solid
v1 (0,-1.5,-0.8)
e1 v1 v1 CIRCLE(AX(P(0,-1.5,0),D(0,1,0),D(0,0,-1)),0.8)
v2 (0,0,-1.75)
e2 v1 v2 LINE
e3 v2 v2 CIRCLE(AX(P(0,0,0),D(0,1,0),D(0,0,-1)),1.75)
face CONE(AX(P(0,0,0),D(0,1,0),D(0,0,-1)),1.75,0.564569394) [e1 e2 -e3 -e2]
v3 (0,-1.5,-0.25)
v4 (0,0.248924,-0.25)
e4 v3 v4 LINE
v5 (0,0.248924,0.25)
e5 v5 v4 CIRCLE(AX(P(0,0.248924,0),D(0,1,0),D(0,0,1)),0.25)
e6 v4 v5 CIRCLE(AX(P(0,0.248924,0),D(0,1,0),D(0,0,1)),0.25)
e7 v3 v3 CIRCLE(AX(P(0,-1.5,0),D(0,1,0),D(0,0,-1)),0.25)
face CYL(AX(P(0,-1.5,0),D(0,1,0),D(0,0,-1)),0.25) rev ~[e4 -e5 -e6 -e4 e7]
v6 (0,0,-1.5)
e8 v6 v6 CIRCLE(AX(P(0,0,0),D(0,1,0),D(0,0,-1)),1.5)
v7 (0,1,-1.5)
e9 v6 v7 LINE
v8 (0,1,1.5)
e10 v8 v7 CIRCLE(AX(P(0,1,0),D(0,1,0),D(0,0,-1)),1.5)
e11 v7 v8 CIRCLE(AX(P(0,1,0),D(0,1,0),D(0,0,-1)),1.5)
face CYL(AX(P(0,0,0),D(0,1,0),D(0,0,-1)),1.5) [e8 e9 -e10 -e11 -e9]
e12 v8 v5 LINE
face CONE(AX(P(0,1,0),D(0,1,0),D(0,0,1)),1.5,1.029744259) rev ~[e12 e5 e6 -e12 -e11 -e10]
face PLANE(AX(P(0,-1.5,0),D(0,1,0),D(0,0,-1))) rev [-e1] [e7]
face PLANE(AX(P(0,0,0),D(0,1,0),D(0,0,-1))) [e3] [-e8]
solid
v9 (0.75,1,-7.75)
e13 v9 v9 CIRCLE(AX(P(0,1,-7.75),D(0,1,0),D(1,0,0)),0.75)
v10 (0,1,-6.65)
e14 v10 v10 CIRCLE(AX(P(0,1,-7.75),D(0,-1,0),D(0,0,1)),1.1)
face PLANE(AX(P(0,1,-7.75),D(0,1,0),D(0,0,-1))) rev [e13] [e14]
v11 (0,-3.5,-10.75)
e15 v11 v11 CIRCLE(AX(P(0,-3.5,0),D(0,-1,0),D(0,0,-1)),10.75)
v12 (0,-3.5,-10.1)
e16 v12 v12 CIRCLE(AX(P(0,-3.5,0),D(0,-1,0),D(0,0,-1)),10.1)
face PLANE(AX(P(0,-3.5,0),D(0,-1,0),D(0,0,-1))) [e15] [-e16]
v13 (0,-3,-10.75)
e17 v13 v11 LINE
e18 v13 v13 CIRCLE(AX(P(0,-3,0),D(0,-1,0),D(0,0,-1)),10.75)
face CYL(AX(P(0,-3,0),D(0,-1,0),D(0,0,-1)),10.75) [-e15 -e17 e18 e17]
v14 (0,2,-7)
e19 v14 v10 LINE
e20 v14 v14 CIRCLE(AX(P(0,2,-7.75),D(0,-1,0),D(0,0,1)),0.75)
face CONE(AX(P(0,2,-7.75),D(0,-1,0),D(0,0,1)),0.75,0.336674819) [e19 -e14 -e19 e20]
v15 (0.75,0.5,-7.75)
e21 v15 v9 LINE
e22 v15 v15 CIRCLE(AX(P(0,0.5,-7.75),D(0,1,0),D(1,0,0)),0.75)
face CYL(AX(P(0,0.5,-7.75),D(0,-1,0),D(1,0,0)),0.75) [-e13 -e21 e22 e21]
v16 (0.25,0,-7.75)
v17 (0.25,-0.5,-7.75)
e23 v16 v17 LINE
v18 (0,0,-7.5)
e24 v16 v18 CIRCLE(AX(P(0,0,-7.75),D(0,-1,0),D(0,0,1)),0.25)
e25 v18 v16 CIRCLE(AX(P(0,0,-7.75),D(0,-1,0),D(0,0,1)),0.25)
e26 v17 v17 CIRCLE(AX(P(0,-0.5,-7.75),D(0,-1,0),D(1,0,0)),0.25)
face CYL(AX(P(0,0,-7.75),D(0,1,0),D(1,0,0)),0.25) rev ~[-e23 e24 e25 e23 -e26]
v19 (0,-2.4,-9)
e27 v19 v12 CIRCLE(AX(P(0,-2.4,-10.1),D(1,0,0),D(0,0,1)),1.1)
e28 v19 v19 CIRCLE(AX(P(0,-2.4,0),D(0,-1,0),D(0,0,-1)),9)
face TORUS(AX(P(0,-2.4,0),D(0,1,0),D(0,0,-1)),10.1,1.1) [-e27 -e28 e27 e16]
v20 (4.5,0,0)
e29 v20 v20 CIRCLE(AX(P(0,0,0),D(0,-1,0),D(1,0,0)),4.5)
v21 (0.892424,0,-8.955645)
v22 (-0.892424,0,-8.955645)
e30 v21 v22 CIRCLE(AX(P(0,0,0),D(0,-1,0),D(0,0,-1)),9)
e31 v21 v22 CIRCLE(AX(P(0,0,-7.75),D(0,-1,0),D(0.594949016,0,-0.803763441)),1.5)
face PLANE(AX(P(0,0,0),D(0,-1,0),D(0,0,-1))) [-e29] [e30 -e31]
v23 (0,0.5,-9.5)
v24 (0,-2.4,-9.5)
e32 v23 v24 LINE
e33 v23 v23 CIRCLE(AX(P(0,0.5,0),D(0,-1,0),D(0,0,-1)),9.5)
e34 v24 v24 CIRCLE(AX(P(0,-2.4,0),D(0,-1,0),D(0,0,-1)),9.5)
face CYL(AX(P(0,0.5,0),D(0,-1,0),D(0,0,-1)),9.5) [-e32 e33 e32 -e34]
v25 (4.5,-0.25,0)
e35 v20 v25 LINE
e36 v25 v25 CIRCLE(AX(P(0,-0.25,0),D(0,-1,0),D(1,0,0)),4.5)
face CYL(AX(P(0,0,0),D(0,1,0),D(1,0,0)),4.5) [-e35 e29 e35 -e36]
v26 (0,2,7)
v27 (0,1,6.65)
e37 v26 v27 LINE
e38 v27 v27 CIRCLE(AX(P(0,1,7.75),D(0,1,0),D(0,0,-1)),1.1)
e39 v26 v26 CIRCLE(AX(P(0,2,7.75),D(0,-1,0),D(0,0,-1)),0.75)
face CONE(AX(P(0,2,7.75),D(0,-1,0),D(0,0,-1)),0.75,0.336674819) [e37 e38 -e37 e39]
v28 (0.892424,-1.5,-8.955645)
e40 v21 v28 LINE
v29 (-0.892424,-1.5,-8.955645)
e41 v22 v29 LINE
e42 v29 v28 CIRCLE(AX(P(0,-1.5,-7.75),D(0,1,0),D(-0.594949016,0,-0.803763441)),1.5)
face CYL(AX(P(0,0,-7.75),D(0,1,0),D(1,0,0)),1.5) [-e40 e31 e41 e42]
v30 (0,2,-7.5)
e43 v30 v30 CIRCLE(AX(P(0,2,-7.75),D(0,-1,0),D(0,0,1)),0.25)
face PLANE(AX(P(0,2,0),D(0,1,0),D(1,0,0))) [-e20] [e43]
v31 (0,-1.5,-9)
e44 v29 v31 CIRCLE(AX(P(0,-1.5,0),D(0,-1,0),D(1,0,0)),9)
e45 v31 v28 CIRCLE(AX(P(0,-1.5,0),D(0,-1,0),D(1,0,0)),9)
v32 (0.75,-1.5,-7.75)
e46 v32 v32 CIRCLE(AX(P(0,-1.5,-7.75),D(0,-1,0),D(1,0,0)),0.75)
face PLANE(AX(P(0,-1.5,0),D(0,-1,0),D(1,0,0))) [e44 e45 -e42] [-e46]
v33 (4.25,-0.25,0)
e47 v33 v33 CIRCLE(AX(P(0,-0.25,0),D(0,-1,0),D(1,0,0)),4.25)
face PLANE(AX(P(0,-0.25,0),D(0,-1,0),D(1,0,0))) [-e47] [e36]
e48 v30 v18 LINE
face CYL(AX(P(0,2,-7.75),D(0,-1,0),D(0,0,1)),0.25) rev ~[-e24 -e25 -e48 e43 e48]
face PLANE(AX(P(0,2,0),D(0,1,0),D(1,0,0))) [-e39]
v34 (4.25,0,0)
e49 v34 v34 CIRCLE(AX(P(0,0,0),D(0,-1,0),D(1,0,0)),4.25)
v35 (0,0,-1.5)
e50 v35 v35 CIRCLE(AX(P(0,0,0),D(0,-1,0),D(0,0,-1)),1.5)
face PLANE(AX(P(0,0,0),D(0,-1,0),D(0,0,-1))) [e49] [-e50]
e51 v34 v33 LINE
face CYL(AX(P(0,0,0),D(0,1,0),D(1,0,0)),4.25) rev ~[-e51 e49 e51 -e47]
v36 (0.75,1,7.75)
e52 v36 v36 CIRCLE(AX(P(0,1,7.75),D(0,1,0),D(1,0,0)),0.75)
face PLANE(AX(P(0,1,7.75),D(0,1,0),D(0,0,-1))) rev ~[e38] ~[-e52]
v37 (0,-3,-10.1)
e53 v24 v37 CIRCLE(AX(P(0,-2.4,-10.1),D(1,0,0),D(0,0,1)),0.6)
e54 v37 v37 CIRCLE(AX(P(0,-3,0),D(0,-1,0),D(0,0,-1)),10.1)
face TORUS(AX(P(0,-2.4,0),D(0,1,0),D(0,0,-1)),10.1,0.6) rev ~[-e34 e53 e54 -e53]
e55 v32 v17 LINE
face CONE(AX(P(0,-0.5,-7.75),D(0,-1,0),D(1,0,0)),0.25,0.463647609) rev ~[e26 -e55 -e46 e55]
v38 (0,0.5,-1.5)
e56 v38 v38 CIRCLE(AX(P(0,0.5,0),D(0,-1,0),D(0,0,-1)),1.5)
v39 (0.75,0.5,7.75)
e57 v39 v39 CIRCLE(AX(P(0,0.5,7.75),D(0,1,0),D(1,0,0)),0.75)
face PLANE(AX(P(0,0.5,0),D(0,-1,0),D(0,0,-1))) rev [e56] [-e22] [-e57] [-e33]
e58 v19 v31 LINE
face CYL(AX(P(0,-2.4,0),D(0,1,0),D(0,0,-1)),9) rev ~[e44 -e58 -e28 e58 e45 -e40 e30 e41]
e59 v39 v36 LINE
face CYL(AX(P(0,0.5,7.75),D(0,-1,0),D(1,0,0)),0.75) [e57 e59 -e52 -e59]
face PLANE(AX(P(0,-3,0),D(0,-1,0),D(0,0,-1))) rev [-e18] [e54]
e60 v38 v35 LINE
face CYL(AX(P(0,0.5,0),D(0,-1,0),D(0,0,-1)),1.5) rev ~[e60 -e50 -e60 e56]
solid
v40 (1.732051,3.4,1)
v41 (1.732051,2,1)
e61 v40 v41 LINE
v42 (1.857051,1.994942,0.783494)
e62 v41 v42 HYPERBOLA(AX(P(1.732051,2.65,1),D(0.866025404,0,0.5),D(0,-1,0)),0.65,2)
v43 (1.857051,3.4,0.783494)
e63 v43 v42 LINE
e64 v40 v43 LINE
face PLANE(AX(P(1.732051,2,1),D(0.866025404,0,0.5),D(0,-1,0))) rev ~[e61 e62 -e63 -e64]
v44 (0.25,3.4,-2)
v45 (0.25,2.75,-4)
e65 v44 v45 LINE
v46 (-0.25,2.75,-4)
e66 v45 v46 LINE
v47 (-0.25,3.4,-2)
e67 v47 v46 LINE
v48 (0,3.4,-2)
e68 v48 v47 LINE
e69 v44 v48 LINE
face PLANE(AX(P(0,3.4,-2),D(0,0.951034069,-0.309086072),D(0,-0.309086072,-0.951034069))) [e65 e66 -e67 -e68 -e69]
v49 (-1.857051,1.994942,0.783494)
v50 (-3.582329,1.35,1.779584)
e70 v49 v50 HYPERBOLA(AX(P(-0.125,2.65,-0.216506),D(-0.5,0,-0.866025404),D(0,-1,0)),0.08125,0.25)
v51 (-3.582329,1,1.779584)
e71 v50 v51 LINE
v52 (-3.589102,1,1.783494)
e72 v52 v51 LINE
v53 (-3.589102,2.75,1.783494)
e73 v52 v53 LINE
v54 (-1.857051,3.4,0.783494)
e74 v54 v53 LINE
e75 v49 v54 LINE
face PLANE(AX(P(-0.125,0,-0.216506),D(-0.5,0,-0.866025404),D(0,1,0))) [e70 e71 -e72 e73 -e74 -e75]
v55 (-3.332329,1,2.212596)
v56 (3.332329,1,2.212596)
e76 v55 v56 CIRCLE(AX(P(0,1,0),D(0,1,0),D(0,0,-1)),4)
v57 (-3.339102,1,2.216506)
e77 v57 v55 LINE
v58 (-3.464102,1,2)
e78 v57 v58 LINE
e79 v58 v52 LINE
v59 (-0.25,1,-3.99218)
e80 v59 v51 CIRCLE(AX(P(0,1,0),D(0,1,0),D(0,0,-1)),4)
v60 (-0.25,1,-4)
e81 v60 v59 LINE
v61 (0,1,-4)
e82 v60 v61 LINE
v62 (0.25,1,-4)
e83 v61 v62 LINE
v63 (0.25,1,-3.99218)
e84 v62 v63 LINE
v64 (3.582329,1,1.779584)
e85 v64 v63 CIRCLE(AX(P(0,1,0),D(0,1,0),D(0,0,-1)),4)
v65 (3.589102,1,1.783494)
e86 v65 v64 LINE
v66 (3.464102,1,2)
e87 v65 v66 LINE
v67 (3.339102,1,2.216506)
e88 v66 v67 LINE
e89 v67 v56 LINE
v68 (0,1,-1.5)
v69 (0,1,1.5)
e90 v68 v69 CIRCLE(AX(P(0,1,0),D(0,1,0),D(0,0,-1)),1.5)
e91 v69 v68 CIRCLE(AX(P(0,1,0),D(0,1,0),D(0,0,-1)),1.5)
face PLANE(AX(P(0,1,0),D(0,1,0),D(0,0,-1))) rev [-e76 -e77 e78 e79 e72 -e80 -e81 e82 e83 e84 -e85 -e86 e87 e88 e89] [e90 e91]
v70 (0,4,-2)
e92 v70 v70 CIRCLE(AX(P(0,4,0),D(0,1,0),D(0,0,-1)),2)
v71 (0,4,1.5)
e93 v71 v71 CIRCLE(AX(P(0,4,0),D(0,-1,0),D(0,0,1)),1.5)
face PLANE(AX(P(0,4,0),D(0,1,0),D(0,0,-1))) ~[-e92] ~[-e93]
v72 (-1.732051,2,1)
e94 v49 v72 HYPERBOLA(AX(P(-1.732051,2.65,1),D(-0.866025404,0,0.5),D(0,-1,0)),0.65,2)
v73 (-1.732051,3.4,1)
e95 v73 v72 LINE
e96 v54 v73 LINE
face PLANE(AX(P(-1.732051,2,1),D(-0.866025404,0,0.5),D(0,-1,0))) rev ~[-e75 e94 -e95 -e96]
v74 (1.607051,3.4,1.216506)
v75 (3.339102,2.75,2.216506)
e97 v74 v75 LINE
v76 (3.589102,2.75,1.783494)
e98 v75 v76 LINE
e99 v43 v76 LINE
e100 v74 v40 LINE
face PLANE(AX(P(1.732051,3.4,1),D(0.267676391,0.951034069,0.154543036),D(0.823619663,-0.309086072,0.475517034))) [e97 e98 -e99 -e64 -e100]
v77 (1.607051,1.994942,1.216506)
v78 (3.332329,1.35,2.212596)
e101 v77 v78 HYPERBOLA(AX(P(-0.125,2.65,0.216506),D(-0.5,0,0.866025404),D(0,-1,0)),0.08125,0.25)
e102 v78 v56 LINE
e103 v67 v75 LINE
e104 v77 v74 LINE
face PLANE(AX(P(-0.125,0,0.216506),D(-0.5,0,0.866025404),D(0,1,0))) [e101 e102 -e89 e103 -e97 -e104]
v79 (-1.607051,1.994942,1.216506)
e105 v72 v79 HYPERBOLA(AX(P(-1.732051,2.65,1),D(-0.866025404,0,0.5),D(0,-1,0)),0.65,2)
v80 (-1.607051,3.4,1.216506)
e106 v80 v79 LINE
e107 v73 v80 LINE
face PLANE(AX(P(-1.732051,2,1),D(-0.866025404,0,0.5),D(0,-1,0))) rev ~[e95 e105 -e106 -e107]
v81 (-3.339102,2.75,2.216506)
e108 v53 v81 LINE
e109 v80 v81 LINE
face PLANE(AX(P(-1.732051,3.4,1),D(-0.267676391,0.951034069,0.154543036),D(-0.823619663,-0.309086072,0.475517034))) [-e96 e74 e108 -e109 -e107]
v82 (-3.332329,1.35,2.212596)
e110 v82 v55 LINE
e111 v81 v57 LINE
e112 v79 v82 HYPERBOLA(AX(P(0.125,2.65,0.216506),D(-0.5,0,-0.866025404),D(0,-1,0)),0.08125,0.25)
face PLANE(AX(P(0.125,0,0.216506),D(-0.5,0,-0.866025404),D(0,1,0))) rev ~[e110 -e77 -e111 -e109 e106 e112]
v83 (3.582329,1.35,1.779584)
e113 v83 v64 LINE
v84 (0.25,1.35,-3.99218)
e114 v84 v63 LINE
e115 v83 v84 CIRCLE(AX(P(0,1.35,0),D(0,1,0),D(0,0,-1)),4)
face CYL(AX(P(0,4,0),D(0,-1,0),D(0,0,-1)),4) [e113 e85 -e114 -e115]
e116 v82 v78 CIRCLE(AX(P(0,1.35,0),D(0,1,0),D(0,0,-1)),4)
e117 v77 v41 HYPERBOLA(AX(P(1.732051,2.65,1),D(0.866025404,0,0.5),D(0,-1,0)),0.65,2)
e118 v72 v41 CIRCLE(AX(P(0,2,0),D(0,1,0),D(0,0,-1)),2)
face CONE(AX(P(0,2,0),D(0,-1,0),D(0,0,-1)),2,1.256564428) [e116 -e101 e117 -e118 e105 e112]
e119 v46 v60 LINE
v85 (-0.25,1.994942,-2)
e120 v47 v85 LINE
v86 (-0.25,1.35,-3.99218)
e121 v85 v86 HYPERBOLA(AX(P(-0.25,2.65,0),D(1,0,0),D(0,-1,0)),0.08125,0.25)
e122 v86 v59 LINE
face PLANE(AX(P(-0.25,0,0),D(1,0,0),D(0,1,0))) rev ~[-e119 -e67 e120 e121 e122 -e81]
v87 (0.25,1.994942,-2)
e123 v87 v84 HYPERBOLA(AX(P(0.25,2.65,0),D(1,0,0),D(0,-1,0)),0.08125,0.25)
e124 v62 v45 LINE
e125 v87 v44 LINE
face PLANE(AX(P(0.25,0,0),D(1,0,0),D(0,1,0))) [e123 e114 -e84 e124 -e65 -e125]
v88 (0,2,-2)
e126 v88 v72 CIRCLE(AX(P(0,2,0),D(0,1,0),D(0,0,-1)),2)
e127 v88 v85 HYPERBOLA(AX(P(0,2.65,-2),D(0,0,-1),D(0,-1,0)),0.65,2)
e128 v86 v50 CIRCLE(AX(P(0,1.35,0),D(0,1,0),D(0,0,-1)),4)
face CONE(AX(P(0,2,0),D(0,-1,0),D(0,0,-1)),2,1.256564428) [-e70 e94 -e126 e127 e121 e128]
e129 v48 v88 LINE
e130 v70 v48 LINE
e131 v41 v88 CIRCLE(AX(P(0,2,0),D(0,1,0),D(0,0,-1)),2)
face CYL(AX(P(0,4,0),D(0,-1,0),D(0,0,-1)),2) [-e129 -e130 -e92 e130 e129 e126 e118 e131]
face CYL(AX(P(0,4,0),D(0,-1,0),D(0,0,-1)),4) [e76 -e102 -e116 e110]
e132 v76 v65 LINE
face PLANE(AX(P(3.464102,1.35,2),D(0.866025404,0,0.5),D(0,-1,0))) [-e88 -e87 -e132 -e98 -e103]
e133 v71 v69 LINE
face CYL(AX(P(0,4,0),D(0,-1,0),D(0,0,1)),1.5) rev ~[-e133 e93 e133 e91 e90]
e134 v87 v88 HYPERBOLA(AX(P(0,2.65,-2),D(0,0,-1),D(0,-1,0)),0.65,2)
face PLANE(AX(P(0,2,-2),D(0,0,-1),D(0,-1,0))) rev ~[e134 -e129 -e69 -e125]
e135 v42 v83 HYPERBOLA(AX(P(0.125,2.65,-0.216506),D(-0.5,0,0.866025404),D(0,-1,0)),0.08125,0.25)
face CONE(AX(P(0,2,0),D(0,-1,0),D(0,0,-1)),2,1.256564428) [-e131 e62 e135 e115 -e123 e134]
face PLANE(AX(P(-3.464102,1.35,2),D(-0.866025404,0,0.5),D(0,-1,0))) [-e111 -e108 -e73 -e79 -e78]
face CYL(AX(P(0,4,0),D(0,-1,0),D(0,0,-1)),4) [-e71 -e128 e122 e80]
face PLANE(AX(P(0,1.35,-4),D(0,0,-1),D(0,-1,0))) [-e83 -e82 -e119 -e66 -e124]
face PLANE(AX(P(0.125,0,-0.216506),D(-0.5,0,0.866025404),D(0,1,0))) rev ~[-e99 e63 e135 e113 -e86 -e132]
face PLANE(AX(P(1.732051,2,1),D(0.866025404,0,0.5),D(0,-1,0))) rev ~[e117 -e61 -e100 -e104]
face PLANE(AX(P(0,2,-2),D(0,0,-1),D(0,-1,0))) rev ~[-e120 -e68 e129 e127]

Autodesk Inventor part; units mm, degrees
ref_plane "YZ Plane" through (0, 0, 0) normal (1, 0, 0) x (0, 1, 0)
ref_plane "XZ Plane" through (0, 0, 0) normal (0, 1, 0) x (-1, 0, 0)
ref_plane "XY Plane" through (0, 0, 0) normal (0, 0, 1) x (1, 0, 0)
sketch "Sketch1" plane through (0, 0, 0) normal (1, 0, 0) x (0, 1, 0)
  line L0 (0, 0) -> (0.5, 0)
  line L1 (0.5, 0) -> (0.5, -9.5)
  line L2 (0.5, -9.5) -> (0, -9.5)
  line L3 (0, -9.5) -> (0, 0)
  line L4 (0, 0) -> (-3.6315, 0)
  line L5 (0, -9.5) -> (-2.4, -9.5)
  line L6 (-3.5, -9.5) -> (-3.5, -9)
  line L7 (-2.4, -9) -> (0, -9)
  line L8 (0, -9) -> (0, -9.5)
  line L9 (-3.5, -9) -> (-3, -9)
  line L10 (-3, -10.1) -> (-3, -10.75)
  line L11 (-3, -10.75) -> (-3.5, -10.75)
  line L12 (-3.5, -10.75) -> (-3.5, -10.1)
  arc A0 (-2.4, -9.5) -> (-3, -10.1) centre (-2.4, -10.1) ccw
  arc A1 (-2.4, -9) -> (-3.5, -10.1) centre (-2.4, -10.1) ccw
  line L13 (0.5, -1.5) -> (-0.0667, -1.5)
  point P0 (-1.8158, 0)
  point P1 (0, -1.5)
  dimension "d0" = 19
  dimension "d1" = 0.5
  dimension "d2" = 4
  dimension "d3" = 0.5
  dimension "d4" = 0.5
  dimension "d5" = 21.5
  dimension "d6" = 0.6
  dimension "d7" = 1.1
  dimension "d8" = 3
revolve "Revolution1" add sketch "Sketch1" angle 360 about axis through (0, 0, 0) along (0, -1, 0) contours L13 L1 L2 L3 | L3 L5 A0 L10 L11 L12 A1 L7
sketch "Sketch2" plane through (0, 0, 0) normal (0, -1, 0) x (1, 0, 0)
  circle A0 centre (0, 0) radius 1.5 projected
  circle A1 centre (0, 0) radius 4.25
  circle A2 centre (0, 0) radius 4.5
  dimension "d10" = 8.5
  dimension "d11" = 9
extrude "Extrusion1" add sketch "Sketch2" along normal blind 0.25 contours A2
sketch "Sketch3" plane through (0, 0.5, 0) normal (0, 1, 0) x (1, 0, 0)
  line L0 (0, 7.75) -> (0, -7.75)
  circle A0 centre (0, 7.75) radius 0.75
  circle A1 centre (0, -7.75) radius 0.75
  point P0 (0, 0)
  point P1 (0, 0)
  dimension "d14" = 15.5
  dimension "d15" = 1.5
  dimension "d16" = 1.5
extrude "Extrusion2" add sketch "Sketch3" along normal blind 1.5
sketch "Sketch4" plane through (0, 0, 0) normal (1, 0, 0) x (0, 1, 0)
  line L0 (2, 7) -> (2, 8.5) projected
  line L1 (2, 7) -> (1, 6.65)
  line L2 (1, 6.65) -> (1, 7)
  line L3 (0.5, 9.5) -> (0.5, -9.5) projected
  line L4 (0.5, -9.5) -> (-2.4, -9.5) projected
  arc A0 (-2.4, -9.5) -> (-3, -10.1) centre (-2.4, -10.1) ccw projected
  line L5 (-3, -10.1) -> (-3, -10.75) projected
  line L6 (-3, -10.75) -> (-3.5, -10.75) projected
  line L7 (-3.5, -10.75) -> (-3.5, -10.1) projected
  arc A1 (-2.4, -9) -> (-3.5, -10.1) centre (-2.4, -10.1) ccw projected
  line L8 (-2.4, -9) -> (0, -9) projected
  line L9 (0, -9) -> (0, -4.5) projected
  line L10 (0, -4.5) -> (-0.25, -4.5) projected
  line L11 (-0.25, -4.5) -> (-0.25, -4.25) projected
  line L12 (-0.25, -4.25) -> (0, -4.25) projected
  line L13 (0, -4.25) -> (0, -1.5) projected
  line L14 (0, -1.5) -> (0.5, -1.5) projected
  line L15 (0.5, -1.5) -> (0.5, -7) projected
  line L16 (0.5, -7) -> (2, -7) projected
  line L17 (2, -7) -> (2, -8.5) projected
  line L18 (2, -8.5) -> (0.5, -8.5) projected
  line L19 (0.5, -8.5) -> (0.5, -9.5) projected
  line L20 (-2.4, 9.5) -> (0.5, 9.5) projected
  line L21 (0.5, 9.5) -> (0.5, 8.5) projected
  line L22 (0.5, 8.5) -> (2, 8.5) projected
  line L23 (2, 7) -> (0.5, 7) projected
  line L24 (0.5, 7) -> (0.5, 1.5) projected
  line L25 (0.5, 1.5) -> (0, 1.5) projected
  line L26 (0, 1.5) -> (0, 4.25) projected
  line L27 (0, 4.25) -> (-0.25, 4.25) projected
  line L28 (-0.25, 4.25) -> (-0.25, 4.5) projected
  line L29 (-0.25, 4.5) -> (0, 4.5) projected
  line L30 (0, 4.5) -> (0, 9) projected
  line L31 (0, 9) -> (-2.4, 9) projected
  arc A2 (-3.5, 10.1) -> (-2.4, 9) centre (-2.4, 10.1) ccw projected
  line L32 (-3.5, 10.1) -> (-3.5, 10.75) projected
  line L33 (-3.5, 10.75) -> (-3, 10.75) projected
  line L34 (-3, 10.75) -> (-3, 10.1) projected
  arc A3 (-3, 10.1) -> (-2.4, 9.5) centre (-2.4, 10.1) ccw projected
  line L35 (2, 7.75) -> (3.0151, 7.75)
  line L36 (2, 8.5) -> (2, 7) projected
  point P0 (0, 0)
  dimension "d19" = 0.5
  dimension "d20" = 0.35
revolve "Revolution2" add sketch "Sketch4" angle 360 about axis through (0, 2, 7.75) along (0, 1, 0) contours L1 L2 L23
mirror "Mirror1" about plane through (0, 0, 0) normal (0, 0, 1) of "Revolution2"
sketch "Sketch5" plane through (0, 2, -7.75) normal (0, 1, 0) x (1, 0, 0)
  circle A0 centre (0, 0) radius 0.75 projected
  circle A1 centre (0, -15.5) radius 0.75 projected
  point P0 (0, -7.75)
hole "Hole1" at (0, 2, -7.75) direction (0, -1, 0) diameter 0.5 end through all
sketch "Sketch6" plane through (0, 0, 0) normal (0, -1, 0) x (1, 0, 0)
  circle A0 centre (0, -7.75) radius 0.25 projected
  circle A1 centre (0, 0) radius 4.25 projected
  circle A2 centre (0, 0) radius 4.5 projected
  circle A3 centre (0, 0) radius 9 projected
  circle A4 centre (0, 0) radius 9.5 projected
  circle A5 centre (0, 0) radius 1.5 projected
  circle A6 centre (0, -7.75) radius 1.5
  point P0 (-0.8924, -8.9556)
  point P1 (0.8924, -8.9556)
  dimension "d29" = 3
extrude "Extrusion3" add sketch "Sketch6" along normal blind 1.5 contours A6 A3 picked at (-0.4441, -8.6355)
chamfer "Chamfer1" distance 0.5 distance2 1 1 edges at (-0.25, -1.5, -7.75)
sketch "Sketch7" plane through (0, 0, 0) normal (1, 0, 0) x (0, 1, 0)
  line L0 (0, -4.5) -> (-0.25, -4.5) projected
  line L1 (-0.25, -4.5) -> (-0.25, -4.25) projected
  line L2 (-0.25, -4.25) -> (0, -4.25) projected
  line L3 (0, -4.25) -> (0, -1.5) projected
  line L4 (0, -1.5) -> (0.5, -1.5) projected
  line L5 (0.5, -1.5) -> (0.5, -7) projected
  line L6 (0.5, -7) -> (1, -7) projected
  line L7 (1, -7) -> (1, -6.65) projected
  line L8 (1, -6.65) -> (2, -7) projected
  line L9 (2, -7) -> (2, -7.5) projected
  line L10 (2, -7.5) -> (-0.5, -7.5) projected
  line L11 (-0.5, -7.5) -> (-1.5, -7) projected
  line L12 (-1.5, -7) -> (-1.5, -6.25) projected
  line L13 (-1.5, -6.25) -> (0, -6.25) projected
  line L14 (0, -6.25) -> (0, -4.5) projected
  line L15 (0.5, -9.5) -> (-2.4, -9.5) projected
  arc A0 (-2.4, -9.5) -> (-3, -10.1) centre (-2.4, -10.1) ccw projected
  line L16 (-3, -10.1) -> (-3, -10.75) projected
  line L17 (-3, -10.75) -> (-3.5, -10.75) projected
  line L18 (-3.5, -10.75) -> (-3.5, -10.1) projected
  arc A1 (-2.4, -9) -> (-3.5, -10.1) centre (-2.4, -10.1) ccw projected
  line L19 (-2.4, -9) -> (-1.5, -9) projected
  line L20 (-1.5, -9) -> (-1.5, -8.5) projected
  line L21 (-1.5, -8.5) -> (-0.5, -8) projected
  line L22 (-0.5, -8) -> (2, -8) projected
  line L23 (2, -8) -> (2, -8.5) projected
  line L24 (2, -8.5) -> (1, -8.85) projected
  line L25 (1, -8.85) -> (1, -8.5) projected
  line L26 (1, -8.5) -> (0.5, -8.5) projected
  line L27 (0.5, -8.5) -> (0.5, -9.5) projected
  line L28 (-2.4, 9.5) -> (0.5, 9.5) projected
  line L29 (0.5, 9.5) -> (0.5, 8.5) projected
  line L30 (0.5, 8.5) -> (1, 8.5) projected
  line L31 (1, 8.5) -> (1, 8.85) projected
  line L32 (1, 8.85) -> (2, 8.5) projected
  line L33 (2, 8.5) -> (2, 7) projected
  line L34 (2, 7) -> (1, 6.65) projected
  line L35 (1, 6.65) -> (1, 7) projected
  line L36 (1, 7) -> (0.5, 7) projected
  line L37 (0.5, 7) -> (0.5, 1.5) projected
  line L38 (0.5, 1.5) -> (0, 1.5) projected
  line L39 (0, 1.5) -> (0, 4.25) projected
  line L40 (0, 4.25) -> (-0.25, 4.25) projected
  line L41 (-0.25, 4.25) -> (-0.25, 4.5) projected
  line L42 (-0.25, 4.5) -> (0, 4.5) projected
  line L43 (0, 4.5) -> (0, 9) projected
  line L44 (0, 9) -> (-2.4, 9) projected
  arc A2 (-3.5, 10.1) -> (-2.4, 9) centre (-2.4, 10.1) ccw projected
  line L45 (-3.5, 10.1) -> (-3.5, 10.75) projected
  line L46 (-3.5, 10.75) -> (-3, 10.75) projected
  line L47 (-3, 10.75) -> (-3, 10.1) projected
  arc A3 (-3, 10.1) -> (-2.4, 9.5) centre (-2.4, 10.1) ccw projected
  line L48 (0.5, 1.5) -> (0.5, -1.5) projected
  line L49 (0.5, 0) -> (4, 0)
  line L50 (4, 0) -> (4, -4)
  line L51 (4, -4) -> (0.5, -4)
  line L52 (0.5, -4) -> (0.5, 0)
  line L53 (0.5, 0) -> (-1.5, 0)
  line L54 (-1.5, 0) -> (-1.5, -1.5)
  line L55 (-1.5, -1.5) -> (0.5, -1.5)
  line L56 (0.5, -1.5) -> (0.5, 0)
  line L57 (4, -2) -> (2, -2)
  line L58 (2, -2) -> (1.35, -4)
  line L59 (0.5, -1.5) -> (1, -1.5)
  line L60 (1, -1.5) -> (1, -4)
  line L61 (1, -4) -> (0.5, -4)
  line L62 (0.5, -4) -> (0.5, -1.5)
  line L63 (0, -1.75) -> (-1.5, -0.8)
  point P0 (0, 0)
  dimension "d35" = 4
  dimension "d36" = 3.5
  dimension "d37" = 2
  dimension "d38" = 0.85
  dimension "d39" = 2
  dimension "d40" = 0.5
  dimension "d41" = 1.5
  dimension "d42" = 0.8
  dimension "d43" = 0.25
revolve "Revolution3" add sketch "Sketch7" angle 360 about axis through (0, 0.5, 0) along (0, 1, 0) separate body contours L63 L55 L3 | L55 L63 L54 L53 L48 L4 | L48 L49 L50 L57 L58 L51 L60 L59
sketch "Sketch8" plane through (0, 4, 0) normal (0, 1, 0) x (1, 0, 0)
  circle A0 centre (0, 0) radius 2 projected
  point P0 (0, 0)
hole "Hole2" at (0, 4, 0) direction (0, -1, 0) diameter 3 depth 3 tip angle 118 bodies 2
sketch "Sketch9" plane through (0, 0, 0) normal (1, 0, 0) x (0, 1, 0)
  line L0 (0, -4.5) -> (-0.25, -4.5) projected
  line L1 (-0.25, -4.5) -> (-0.25, -4.25) projected
  line L2 (-0.25, -4.25) -> (0, -4.25) projected
  line L3 (0, -4.25) -> (0, -1.5) projected
  line L4 (0, -1.5) -> (0.5, -1.5) projected
  line L5 (0.5, -1.5) -> (0.5, -7) projected
  line L6 (0.5, -7) -> (1, -7) projected
  line L7 (1, -7) -> (1, -6.65) projected
  line L8 (1, -6.65) -> (2, -7) projected
  line L9 (2, -7) -> (2, -7.5) projected
  line L10 (2, -7.5) -> (-0.5, -7.5) projected
  line L11 (-0.5, -7.5) -> (-1.5, -7) projected
  line L12 (-1.5, -7) -> (-1.5, -6.25) projected
  line L13 (-1.5, -6.25) -> (0, -6.25) projected
  line L14 (0, -6.25) -> (0, -4.5) projected
  line L15 (0.5, -9.5) -> (-2.4, -9.5) projected
  arc A0 (-2.4, -9.5) -> (-3, -10.1) centre (-2.4, -10.1) ccw projected
  line L16 (-3, -10.1) -> (-3, -10.75) projected
  line L17 (-3, -10.75) -> (-3.5, -10.75) projected
  line L18 (-3.5, -10.75) -> (-3.5, -10.1) projected
  arc A1 (-2.4, -9) -> (-3.5, -10.1) centre (-2.4, -10.1) ccw projected
  line L19 (-2.4, -9) -> (-1.5, -9) projected
  line L20 (-1.5, -9) -> (-1.5, -8.5) projected
  line L21 (-1.5, -8.5) -> (-0.5, -8) projected
  line L22 (-0.5, -8) -> (2, -8) projected
  line L23 (2, -8) -> (2, -8.5) projected
  line L24 (2, -8.5) -> (1, -8.85) projected
  line L25 (1, -8.85) -> (1, -8.5) projected
  line L26 (1, -8.5) -> (0.5, -8.5) projected
  line L27 (0.5, -8.5) -> (0.5, -9.5) projected
  line L28 (-2.4, 9.5) -> (0.5, 9.5) projected
  line L29 (0.5, 9.5) -> (0.5, 8.5) projected
  line L30 (0.5, 8.5) -> (1, 8.5) projected
  line L31 (1, 8.5) -> (1, 8.85) projected
  line L32 (1, 8.85) -> (2, 8.5) projected
  line L33 (2, 8.5) -> (2, 7) projected
  line L34 (2, 7) -> (1, 6.65) projected
  line L35 (1, 6.65) -> (1, 7) projected
  line L36 (1, 7) -> (0.5, 7) projected
  line L37 (0.5, 7) -> (0.5, 1.5) projected
  line L38 (0.5, 1.5) -> (0, 1.5) projected
  line L39 (0, 1.5) -> (0, 4.25) projected
  line L40 (0, 4.25) -> (-0.25, 4.25) projected
  line L41 (-0.25, 4.25) -> (-0.25, 4.5) projected
  line L42 (-0.25, 4.5) -> (0, 4.5) projected
  line L43 (0, 4.5) -> (0, 9) projected
  line L44 (0, 9) -> (-2.4, 9) projected
  arc A2 (-3.5, 10.1) -> (-2.4, 9) centre (-2.4, 10.1) ccw projected
  line L45 (-3.5, 10.1) -> (-3.5, 10.75) projected
  line L46 (-3.5, 10.75) -> (-3, 10.75) projected
  line L47 (-3, 10.75) -> (-3, 10.1) projected
  arc A3 (-3, 10.1) -> (-2.4, 9.5) centre (-2.4, 10.1) ccw projected
  line L48 (-1.5, -0.8) -> (-1.5, 0.8) projected
  line L49 (-1.5, 0.8) -> (0, 1.75) projected
  line L50 (0, 1.75) -> (0, 1.5) projected
  line L51 (0, 1.5) -> (1, 1.5) projected
  line L52 (1, 1.5) -> (1, 4) projected
  line L53 (1, 4) -> (1.35, 4) projected
  line L54 (1.35, 4) -> (2, 2) projected
  line L55 (2, 2) -> (4, 2) projected
  line L56 (4, 2) -> (4, 1.5) projected
  line L57 (4, 1.5) -> (1, 1.5) projected
  line L58 (1, 1.5) -> (0.0987, 0) projected
  line L59 (0.0987, 0) -> (1, -1.5) projected
  line L60 (1, -1.5) -> (4, -1.5) projected
  line L61 (4, -1.5) -> (4, -2) projected
  line L62 (4, -2) -> (2, -2) projected
  line L63 (2, -2) -> (1.35, -4) projected
  line L64 (1.35, -4) -> (1, -4) projected
  line L65 (1, -4) -> (1, -1.5) projected
  line L66 (1, -1.5) -> (0, -1.5) projected
  line L67 (0, -1.5) -> (0, -1.75) projected
  line L68 (0, -1.75) -> (-1.5, -0.8) projected
  line L69 (3.4, -2) -> (2.75, -4)
  line L70 (2.75, -4) -> (1, -4)
  line L71 (2, -2) -> (2, 2) projected
  line L72 (2, -2) -> (1, -2)
  point P0 (0, 0)
  dimension "d52" = 0.6
extrude "Extrusion4" add sketch "Sketch9" along normal mid plane 0.5 contours L72 L63 L64 L65 | L62 L69 L70 L63 bodies 2
pattern_circular "Circular Pattern1" count 3 over 360 about axis through (0, 3, 0) along (0, 1, 0) of "Extrusion4" bodies 2
sketch "Sketch10" plane through (0, -1.5, 0) normal (0, -1, 0) x (1, 0, 0)
  circle A0 centre (0, -7.75) radius 0.75 projected
  arc A1 (-0.8924, -8.9556) -> (0.8924, -8.9556) centre (0, 0) ccw projected
  arc A2 (0.8924, -8.9556) -> (-0.8924, -8.9556) centre (0, -7.75) ccw projected
  arc A3 (0.8924, -8.9556) -> (-0.8924, -8.9556) centre (0, 0) ccw projected
  circle A4 centre (0, 0) radius 9.5 projected
  circle A5 centre (0, 0) radius 0.8 projected
  point P0 (0, 0)
hole "Hole3" at (0, -1.5, 0) direction (0, 1, 0) diameter 0.5 depth 30 bodies 2
equation "\"d3\" = d1"
equation "\"d4\" = d1"
properties part number "Pressure Plate" material "Acetal Resin, White"
